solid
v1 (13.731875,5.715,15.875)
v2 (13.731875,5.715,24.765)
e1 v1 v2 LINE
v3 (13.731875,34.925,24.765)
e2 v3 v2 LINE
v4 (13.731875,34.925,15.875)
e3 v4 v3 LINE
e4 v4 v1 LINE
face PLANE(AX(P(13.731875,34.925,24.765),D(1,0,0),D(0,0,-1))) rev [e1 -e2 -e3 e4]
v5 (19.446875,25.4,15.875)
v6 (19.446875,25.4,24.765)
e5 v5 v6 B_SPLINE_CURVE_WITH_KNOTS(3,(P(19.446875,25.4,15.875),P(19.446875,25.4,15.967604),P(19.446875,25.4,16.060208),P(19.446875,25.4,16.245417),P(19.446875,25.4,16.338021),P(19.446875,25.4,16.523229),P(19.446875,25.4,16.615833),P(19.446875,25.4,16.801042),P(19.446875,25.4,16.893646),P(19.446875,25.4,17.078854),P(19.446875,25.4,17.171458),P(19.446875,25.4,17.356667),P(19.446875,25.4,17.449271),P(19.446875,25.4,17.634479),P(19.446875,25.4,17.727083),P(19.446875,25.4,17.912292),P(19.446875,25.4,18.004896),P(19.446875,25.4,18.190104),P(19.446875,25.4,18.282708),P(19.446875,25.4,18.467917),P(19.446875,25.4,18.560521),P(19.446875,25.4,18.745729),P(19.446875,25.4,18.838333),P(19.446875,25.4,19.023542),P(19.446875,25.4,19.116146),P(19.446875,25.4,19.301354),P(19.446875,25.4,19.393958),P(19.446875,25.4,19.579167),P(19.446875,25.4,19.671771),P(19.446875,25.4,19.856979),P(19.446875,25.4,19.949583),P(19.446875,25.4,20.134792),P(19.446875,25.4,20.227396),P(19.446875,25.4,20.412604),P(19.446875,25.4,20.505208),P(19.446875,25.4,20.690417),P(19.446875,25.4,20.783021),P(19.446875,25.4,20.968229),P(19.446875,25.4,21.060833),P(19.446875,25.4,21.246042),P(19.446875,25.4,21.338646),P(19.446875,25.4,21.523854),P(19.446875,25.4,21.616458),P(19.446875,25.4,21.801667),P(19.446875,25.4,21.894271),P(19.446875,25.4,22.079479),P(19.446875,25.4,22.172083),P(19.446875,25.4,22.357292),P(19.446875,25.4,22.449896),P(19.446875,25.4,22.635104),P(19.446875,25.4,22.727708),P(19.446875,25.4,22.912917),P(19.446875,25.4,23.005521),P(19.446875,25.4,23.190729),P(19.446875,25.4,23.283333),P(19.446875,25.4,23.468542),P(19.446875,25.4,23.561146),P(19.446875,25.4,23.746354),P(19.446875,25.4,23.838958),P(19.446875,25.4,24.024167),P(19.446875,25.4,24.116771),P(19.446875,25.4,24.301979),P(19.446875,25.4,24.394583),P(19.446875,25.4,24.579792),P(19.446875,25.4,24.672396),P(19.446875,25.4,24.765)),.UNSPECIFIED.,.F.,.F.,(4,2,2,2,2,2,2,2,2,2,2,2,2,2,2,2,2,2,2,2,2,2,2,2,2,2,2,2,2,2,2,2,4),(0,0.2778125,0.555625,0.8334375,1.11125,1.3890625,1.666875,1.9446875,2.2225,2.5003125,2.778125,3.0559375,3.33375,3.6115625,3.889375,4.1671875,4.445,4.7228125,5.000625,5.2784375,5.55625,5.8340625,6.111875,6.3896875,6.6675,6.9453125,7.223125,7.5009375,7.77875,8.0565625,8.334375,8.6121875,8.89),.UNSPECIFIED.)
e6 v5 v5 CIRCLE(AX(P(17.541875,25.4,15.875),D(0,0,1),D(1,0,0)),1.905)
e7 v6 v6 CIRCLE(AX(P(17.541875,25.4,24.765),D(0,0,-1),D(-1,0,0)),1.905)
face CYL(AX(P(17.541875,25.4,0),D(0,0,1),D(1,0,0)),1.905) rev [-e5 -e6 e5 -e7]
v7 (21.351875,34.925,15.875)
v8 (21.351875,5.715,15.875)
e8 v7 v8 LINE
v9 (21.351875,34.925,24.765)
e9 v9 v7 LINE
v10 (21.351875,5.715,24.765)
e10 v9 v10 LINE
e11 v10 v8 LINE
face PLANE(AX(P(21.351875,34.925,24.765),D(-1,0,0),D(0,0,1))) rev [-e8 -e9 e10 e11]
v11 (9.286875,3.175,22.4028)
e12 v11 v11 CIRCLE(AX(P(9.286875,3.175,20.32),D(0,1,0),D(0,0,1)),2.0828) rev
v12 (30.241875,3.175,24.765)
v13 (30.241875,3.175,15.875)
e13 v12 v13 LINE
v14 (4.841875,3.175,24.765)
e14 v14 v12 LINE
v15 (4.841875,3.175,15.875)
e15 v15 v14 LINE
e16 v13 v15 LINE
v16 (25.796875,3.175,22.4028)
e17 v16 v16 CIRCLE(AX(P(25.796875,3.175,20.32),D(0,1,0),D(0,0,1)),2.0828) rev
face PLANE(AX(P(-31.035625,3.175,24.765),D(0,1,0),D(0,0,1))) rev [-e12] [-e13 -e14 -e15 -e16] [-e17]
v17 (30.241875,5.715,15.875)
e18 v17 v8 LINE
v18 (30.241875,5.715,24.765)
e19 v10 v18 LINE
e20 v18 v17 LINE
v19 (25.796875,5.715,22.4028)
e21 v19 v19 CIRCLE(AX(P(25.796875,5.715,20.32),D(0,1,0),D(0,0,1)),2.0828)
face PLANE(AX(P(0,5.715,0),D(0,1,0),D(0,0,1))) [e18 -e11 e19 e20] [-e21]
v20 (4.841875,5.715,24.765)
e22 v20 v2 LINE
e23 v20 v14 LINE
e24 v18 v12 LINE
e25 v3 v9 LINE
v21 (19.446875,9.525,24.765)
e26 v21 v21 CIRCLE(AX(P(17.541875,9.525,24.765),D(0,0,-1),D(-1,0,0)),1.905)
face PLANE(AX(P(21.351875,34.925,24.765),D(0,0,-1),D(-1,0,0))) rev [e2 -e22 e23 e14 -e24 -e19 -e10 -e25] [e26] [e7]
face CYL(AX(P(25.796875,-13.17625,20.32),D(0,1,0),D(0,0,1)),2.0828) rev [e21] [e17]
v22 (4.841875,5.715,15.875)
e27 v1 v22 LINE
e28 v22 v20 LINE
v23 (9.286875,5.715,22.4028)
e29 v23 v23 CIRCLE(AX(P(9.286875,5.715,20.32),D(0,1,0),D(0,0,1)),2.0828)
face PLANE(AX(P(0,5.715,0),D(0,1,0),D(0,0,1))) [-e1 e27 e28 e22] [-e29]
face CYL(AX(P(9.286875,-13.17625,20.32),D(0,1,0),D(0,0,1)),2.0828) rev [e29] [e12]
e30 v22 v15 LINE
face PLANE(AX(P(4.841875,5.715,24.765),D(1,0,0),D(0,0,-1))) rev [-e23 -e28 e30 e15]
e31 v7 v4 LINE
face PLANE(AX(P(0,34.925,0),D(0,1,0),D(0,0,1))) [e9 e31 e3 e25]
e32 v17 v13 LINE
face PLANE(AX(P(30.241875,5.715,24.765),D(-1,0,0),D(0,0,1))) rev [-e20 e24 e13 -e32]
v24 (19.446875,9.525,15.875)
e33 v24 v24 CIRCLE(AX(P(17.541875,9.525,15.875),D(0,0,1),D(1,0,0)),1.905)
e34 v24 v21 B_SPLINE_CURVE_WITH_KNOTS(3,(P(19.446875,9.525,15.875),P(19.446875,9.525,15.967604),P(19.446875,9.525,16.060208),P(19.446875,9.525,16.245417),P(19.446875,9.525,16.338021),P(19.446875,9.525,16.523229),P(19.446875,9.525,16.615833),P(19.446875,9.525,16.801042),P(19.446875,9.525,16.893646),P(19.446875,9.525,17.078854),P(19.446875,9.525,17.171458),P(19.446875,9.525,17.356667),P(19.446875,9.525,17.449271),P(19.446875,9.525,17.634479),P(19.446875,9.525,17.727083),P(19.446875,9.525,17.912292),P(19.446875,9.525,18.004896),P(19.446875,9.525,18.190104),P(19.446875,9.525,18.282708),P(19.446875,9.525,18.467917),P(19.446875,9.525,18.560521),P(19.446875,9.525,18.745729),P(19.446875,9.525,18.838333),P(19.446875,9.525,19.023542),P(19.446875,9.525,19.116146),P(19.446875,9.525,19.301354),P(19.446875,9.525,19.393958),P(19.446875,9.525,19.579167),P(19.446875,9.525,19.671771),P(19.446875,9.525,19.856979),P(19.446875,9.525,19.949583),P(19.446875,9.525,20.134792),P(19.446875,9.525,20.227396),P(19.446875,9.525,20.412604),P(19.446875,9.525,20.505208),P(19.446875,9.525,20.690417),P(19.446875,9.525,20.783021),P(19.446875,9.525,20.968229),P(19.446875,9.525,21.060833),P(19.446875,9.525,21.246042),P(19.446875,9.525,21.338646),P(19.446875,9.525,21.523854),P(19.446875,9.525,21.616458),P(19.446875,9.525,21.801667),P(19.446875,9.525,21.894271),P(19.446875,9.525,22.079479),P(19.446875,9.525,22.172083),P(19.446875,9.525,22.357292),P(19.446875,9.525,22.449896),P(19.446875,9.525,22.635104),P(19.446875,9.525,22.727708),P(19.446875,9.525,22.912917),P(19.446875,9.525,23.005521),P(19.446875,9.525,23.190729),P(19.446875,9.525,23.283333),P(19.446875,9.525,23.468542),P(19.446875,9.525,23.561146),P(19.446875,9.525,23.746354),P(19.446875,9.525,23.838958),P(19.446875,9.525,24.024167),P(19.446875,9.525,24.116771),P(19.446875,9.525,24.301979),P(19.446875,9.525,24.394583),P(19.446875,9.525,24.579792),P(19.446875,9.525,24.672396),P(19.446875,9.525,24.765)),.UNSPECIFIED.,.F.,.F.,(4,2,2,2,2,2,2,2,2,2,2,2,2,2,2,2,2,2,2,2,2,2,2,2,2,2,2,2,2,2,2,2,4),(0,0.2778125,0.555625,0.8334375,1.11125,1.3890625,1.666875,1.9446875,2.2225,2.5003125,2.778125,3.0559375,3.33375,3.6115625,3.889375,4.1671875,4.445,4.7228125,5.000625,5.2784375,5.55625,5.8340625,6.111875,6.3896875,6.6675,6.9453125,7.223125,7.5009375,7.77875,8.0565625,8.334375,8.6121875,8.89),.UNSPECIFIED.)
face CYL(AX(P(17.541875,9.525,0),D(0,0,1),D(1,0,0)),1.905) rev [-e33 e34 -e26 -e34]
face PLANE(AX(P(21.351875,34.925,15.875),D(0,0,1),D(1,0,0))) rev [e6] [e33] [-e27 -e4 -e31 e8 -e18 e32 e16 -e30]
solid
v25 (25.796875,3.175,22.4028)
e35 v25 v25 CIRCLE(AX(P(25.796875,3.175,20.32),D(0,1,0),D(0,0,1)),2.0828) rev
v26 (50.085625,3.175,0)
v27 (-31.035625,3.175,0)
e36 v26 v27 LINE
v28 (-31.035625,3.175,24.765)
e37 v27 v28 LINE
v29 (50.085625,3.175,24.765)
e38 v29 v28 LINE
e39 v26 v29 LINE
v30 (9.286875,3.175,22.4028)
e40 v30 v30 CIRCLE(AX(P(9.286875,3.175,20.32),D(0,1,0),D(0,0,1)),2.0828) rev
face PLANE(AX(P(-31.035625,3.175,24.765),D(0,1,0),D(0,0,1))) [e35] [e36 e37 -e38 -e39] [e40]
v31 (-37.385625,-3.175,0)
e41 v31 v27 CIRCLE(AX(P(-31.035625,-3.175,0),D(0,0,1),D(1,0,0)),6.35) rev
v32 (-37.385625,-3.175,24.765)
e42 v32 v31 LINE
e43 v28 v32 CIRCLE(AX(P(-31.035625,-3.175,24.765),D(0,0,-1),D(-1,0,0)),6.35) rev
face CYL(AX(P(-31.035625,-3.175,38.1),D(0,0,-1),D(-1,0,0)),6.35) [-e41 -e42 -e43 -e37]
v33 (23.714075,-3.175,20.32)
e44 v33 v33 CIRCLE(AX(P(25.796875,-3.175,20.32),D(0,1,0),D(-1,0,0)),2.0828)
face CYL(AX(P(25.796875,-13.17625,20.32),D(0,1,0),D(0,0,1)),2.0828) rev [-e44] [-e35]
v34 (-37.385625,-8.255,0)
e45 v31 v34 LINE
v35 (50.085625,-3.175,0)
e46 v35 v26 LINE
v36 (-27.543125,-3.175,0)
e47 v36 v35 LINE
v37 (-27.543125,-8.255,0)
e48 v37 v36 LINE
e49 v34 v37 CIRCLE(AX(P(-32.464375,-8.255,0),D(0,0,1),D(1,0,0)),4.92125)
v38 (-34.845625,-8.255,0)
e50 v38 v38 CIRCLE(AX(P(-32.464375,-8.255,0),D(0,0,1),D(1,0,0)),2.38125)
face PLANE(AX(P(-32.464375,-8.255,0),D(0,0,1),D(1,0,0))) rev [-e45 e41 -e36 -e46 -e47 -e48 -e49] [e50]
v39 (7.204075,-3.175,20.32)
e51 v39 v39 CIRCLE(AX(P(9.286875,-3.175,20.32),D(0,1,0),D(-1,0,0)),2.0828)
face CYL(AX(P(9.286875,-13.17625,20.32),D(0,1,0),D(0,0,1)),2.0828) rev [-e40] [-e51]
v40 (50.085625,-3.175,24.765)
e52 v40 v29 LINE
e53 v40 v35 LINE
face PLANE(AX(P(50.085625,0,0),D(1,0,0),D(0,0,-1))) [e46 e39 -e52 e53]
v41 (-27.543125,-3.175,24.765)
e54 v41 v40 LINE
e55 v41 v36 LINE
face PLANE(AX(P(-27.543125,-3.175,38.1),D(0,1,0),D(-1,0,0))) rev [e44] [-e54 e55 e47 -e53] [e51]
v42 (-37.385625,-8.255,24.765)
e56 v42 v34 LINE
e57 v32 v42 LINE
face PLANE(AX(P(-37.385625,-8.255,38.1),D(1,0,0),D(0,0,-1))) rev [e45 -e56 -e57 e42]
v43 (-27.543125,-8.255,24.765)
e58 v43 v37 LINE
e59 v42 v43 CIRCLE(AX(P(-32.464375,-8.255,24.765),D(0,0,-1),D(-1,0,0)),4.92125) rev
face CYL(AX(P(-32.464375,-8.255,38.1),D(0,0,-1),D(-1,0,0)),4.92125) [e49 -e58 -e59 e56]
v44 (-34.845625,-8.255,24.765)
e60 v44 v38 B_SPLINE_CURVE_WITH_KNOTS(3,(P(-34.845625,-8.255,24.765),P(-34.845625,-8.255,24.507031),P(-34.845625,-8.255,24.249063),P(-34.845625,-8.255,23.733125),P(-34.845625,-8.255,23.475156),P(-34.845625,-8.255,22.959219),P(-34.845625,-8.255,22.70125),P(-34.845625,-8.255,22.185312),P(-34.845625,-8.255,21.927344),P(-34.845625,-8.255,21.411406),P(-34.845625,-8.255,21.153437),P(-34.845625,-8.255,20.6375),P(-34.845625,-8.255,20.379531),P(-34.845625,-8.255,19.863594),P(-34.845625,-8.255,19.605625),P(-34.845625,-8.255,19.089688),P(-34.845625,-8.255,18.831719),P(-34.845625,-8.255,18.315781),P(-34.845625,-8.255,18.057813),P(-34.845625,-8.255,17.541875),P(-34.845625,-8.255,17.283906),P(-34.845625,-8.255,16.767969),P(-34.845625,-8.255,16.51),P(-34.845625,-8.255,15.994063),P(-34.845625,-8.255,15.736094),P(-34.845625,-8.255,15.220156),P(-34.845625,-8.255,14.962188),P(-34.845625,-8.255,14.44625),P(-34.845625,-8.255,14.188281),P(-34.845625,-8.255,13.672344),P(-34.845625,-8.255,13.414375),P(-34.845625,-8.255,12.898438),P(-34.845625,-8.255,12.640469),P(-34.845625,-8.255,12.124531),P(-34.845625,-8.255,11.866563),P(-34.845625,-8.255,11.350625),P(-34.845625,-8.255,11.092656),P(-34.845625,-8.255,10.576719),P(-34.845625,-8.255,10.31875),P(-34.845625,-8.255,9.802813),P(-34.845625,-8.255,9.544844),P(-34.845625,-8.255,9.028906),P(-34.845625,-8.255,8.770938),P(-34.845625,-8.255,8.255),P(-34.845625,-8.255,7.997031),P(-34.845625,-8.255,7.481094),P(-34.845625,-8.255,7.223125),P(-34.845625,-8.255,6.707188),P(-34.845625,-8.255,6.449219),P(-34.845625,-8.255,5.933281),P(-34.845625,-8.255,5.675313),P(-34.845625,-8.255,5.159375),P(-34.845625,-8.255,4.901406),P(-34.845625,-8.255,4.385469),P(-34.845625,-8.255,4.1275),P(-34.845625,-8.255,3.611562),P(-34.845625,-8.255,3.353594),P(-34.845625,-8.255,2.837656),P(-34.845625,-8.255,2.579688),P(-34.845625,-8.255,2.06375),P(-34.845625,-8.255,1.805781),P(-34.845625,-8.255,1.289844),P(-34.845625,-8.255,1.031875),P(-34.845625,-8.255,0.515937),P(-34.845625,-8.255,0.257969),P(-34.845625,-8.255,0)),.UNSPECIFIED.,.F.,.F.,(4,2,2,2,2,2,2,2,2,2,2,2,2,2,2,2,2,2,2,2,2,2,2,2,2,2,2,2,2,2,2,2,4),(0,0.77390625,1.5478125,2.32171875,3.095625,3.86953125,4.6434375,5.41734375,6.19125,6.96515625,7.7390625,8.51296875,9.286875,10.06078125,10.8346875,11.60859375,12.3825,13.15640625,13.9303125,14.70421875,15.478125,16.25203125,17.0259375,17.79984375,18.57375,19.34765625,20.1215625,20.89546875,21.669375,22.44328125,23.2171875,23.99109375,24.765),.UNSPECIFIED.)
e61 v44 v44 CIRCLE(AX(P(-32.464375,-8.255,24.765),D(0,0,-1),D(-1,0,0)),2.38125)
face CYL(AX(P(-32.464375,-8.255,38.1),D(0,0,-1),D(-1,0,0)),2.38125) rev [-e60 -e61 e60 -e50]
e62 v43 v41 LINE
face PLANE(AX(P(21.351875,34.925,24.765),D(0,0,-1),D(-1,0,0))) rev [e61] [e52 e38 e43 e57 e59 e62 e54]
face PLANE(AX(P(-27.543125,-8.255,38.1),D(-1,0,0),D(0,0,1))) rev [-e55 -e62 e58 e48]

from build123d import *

# Parameters (mm, degrees)
SKETCH1_R               = 2.38125
BOSS_EXTRUDE1_DEPTH     = 38.1
FILLET1_R               = 6.35
SKETCH3_W               = 38.1
SKETCH3_H               = 6.35
BOSS_EXTRUDE2_DEPTH     = 12.7
SKETCH2_W               = 7.62
SKETCH2_H               = 8.89
BOSS_EXTRUDE3_DEPTH     = 31.75
CUT_EXTRUDE1_DEPTH      = 66.891051605
CUT_EXTRUDE1_DEPTH_BACK = 66.891051605
SKETCH5_R               = 1.905
SKETCH6_W               = 25.4
SKETCH6_H               = 8.89
BOSS_EXTRUDE4_DEPTH     = 2.54
CUT_EXTRUDE2_DEPTH      = 70.378699409
CUT_EXTRUDE2_DEPTH_BACK = 70.378699409
SKETCH7_R               = 2.0828
CUT_EXTRUDE3_DEPTH      = 13.335


# Read off the part's stored shape, not the designer's step: Split1
with BuildPart() as part:
    # Sketch1 → Boss-Extrude1 (new body)
    with BuildSketch(Plane.XY):
        with BuildLine():
            Line((-37.385625, -8.255), (-37.385625, -3.175))
            Line((-37.385625, -3.175), (-37.385625, 3.175))
            Line((-37.385625, 3.175), (37.385625, 3.175))
            Line((37.385625, 3.175), (37.385625, -3.175))
            Line((37.385625, -3.175), (-27.543125, -3.175))
            Line((-27.543125, -3.175), (-27.543125, -8.255))
            ThreePointArc((-27.543125, -8.255), (-32.464375, -13.17625), (-37.385625, -8.255))
        make_face()
        with Locations(Location((-32.464375, -8.255, 0), (0, 0, 180))):
            Circle(SKETCH1_R, mode=Mode.SUBTRACT)
    extrude(amount=BOSS_EXTRUDE1_DEPTH)

    # Fillet1
    fillet1_edges = [part.edges().sort_by_distance(p)[0] for p in [
        (-37.385625, 3.175, 19.05),
    ]]
    fillet(fillet1_edges, radius=FILLET1_R)

    # Sketch3 → Boss-Extrude2 (add)
    with BuildSketch(Plane(origin=(37.385625, 0, 0), x_dir=(0, 0, -1), z_dir=(1, 0, 0))):
        with Locations((-19.05, 0)):
            Rectangle(SKETCH3_W, SKETCH3_H)
    extrude(amount=BOSS_EXTRUDE2_DEPTH)

    # Sketch2 → Boss-Extrude3 (add)
    with BuildSketch(Plane(origin=(0, 3.175, 0), x_dir=(1, 0, 0), z_dir=(0, 1, 0))):
        with Locations((17.541875, -20.32)):
            Rectangle(SKETCH2_W, SKETCH2_H)
    extrude(amount=BOSS_EXTRUDE3_DEPTH)

    # Sketch5 → Cut-Extrude1 (cut, two sides: drawn at the far end of the back side and taken through both)
    with BuildSketch(Plane.XY.offset(24.765).offset(-CUT_EXTRUDE1_DEPTH_BACK)):
        with Locations((17.541875, 9.525)):
            Circle(SKETCH5_R)
        with Locations((17.541875, 25.4)):
            Circle(SKETCH5_R)
    extrude(amount=CUT_EXTRUDE1_DEPTH + CUT_EXTRUDE1_DEPTH_BACK, mode=Mode.SUBTRACT)

    # Sketch6 → Boss-Extrude4 (add)
    with BuildSketch(Plane(origin=(0, 3.175, 0), x_dir=(1, 0, 0), z_dir=(0, 1, 0))):
        with Locations((17.541875, -20.32)):
            Rectangle(SKETCH6_W, SKETCH6_H)
    extrude(amount=BOSS_EXTRUDE4_DEPTH)

    # Sketch7 → Cut-Extrude2 (cut, two sides: drawn at the far end of the back side and taken through both)
    with BuildSketch(Plane(origin=(0, 5.715, 0), x_dir=(1, 0, 0), z_dir=(0, 1, 0)).offset(-CUT_EXTRUDE2_DEPTH_BACK)):
        with Locations(Location((9.286875, -20.32, 0), (0, 0, 270))):
            Circle(SKETCH7_R)
        with Locations(Location((25.796875, -20.32, 0), (0, 0, 270))):
            Circle(SKETCH7_R)
    extrude(amount=CUT_EXTRUDE2_DEPTH + CUT_EXTRUDE2_DEPTH_BACK, mode=Mode.SUBTRACT)

    # Sketch9 → Cut-Extrude3 (cut)
    with BuildSketch(Plane.XY.offset(38.1)):
        with BuildLine():
            Line((50.085625, 3.175), (50.085625, -3.175))
            Line((50.085625, -3.175), (-27.543125, -3.175))
            Line((-27.543125, -3.175), (-27.543125, -8.255))
            ThreePointArc((-27.543125, -8.255), (-32.464375, -13.17625), (-37.385625, -8.255))
            Line((-37.385625, -8.255), (-37.385625, -3.175))
            ThreePointArc((-37.385625, -3.175), (-35.525753061, 1.315128061), (-31.035625, 3.175))
            Line((-31.035625, 3.175), (50.085625, 3.175))
        make_face()
    extrude(amount=-CUT_EXTRUDE3_DEPTH, mode=Mode.SUBTRACT)


with BuildPart() as body_2:
    # Split1: the piece on the far side of the plane
    add(part.part)
    split(bisect_by=Plane(origin=(0, 3.175, 0), x_dir=(1, 0, 0), z_dir=(0, 1, 0)), keep=Keep.BOTTOM)


with BuildPart() as part_1:
    add(part.part)

    # Split1
    split(bisect_by=Plane(origin=(0, 3.175, 0), x_dir=(1, 0, 0), z_dir=(0, 1, 0)), keep=Keep.TOP)


solid = Compound([body_2.part, part_1.part])
